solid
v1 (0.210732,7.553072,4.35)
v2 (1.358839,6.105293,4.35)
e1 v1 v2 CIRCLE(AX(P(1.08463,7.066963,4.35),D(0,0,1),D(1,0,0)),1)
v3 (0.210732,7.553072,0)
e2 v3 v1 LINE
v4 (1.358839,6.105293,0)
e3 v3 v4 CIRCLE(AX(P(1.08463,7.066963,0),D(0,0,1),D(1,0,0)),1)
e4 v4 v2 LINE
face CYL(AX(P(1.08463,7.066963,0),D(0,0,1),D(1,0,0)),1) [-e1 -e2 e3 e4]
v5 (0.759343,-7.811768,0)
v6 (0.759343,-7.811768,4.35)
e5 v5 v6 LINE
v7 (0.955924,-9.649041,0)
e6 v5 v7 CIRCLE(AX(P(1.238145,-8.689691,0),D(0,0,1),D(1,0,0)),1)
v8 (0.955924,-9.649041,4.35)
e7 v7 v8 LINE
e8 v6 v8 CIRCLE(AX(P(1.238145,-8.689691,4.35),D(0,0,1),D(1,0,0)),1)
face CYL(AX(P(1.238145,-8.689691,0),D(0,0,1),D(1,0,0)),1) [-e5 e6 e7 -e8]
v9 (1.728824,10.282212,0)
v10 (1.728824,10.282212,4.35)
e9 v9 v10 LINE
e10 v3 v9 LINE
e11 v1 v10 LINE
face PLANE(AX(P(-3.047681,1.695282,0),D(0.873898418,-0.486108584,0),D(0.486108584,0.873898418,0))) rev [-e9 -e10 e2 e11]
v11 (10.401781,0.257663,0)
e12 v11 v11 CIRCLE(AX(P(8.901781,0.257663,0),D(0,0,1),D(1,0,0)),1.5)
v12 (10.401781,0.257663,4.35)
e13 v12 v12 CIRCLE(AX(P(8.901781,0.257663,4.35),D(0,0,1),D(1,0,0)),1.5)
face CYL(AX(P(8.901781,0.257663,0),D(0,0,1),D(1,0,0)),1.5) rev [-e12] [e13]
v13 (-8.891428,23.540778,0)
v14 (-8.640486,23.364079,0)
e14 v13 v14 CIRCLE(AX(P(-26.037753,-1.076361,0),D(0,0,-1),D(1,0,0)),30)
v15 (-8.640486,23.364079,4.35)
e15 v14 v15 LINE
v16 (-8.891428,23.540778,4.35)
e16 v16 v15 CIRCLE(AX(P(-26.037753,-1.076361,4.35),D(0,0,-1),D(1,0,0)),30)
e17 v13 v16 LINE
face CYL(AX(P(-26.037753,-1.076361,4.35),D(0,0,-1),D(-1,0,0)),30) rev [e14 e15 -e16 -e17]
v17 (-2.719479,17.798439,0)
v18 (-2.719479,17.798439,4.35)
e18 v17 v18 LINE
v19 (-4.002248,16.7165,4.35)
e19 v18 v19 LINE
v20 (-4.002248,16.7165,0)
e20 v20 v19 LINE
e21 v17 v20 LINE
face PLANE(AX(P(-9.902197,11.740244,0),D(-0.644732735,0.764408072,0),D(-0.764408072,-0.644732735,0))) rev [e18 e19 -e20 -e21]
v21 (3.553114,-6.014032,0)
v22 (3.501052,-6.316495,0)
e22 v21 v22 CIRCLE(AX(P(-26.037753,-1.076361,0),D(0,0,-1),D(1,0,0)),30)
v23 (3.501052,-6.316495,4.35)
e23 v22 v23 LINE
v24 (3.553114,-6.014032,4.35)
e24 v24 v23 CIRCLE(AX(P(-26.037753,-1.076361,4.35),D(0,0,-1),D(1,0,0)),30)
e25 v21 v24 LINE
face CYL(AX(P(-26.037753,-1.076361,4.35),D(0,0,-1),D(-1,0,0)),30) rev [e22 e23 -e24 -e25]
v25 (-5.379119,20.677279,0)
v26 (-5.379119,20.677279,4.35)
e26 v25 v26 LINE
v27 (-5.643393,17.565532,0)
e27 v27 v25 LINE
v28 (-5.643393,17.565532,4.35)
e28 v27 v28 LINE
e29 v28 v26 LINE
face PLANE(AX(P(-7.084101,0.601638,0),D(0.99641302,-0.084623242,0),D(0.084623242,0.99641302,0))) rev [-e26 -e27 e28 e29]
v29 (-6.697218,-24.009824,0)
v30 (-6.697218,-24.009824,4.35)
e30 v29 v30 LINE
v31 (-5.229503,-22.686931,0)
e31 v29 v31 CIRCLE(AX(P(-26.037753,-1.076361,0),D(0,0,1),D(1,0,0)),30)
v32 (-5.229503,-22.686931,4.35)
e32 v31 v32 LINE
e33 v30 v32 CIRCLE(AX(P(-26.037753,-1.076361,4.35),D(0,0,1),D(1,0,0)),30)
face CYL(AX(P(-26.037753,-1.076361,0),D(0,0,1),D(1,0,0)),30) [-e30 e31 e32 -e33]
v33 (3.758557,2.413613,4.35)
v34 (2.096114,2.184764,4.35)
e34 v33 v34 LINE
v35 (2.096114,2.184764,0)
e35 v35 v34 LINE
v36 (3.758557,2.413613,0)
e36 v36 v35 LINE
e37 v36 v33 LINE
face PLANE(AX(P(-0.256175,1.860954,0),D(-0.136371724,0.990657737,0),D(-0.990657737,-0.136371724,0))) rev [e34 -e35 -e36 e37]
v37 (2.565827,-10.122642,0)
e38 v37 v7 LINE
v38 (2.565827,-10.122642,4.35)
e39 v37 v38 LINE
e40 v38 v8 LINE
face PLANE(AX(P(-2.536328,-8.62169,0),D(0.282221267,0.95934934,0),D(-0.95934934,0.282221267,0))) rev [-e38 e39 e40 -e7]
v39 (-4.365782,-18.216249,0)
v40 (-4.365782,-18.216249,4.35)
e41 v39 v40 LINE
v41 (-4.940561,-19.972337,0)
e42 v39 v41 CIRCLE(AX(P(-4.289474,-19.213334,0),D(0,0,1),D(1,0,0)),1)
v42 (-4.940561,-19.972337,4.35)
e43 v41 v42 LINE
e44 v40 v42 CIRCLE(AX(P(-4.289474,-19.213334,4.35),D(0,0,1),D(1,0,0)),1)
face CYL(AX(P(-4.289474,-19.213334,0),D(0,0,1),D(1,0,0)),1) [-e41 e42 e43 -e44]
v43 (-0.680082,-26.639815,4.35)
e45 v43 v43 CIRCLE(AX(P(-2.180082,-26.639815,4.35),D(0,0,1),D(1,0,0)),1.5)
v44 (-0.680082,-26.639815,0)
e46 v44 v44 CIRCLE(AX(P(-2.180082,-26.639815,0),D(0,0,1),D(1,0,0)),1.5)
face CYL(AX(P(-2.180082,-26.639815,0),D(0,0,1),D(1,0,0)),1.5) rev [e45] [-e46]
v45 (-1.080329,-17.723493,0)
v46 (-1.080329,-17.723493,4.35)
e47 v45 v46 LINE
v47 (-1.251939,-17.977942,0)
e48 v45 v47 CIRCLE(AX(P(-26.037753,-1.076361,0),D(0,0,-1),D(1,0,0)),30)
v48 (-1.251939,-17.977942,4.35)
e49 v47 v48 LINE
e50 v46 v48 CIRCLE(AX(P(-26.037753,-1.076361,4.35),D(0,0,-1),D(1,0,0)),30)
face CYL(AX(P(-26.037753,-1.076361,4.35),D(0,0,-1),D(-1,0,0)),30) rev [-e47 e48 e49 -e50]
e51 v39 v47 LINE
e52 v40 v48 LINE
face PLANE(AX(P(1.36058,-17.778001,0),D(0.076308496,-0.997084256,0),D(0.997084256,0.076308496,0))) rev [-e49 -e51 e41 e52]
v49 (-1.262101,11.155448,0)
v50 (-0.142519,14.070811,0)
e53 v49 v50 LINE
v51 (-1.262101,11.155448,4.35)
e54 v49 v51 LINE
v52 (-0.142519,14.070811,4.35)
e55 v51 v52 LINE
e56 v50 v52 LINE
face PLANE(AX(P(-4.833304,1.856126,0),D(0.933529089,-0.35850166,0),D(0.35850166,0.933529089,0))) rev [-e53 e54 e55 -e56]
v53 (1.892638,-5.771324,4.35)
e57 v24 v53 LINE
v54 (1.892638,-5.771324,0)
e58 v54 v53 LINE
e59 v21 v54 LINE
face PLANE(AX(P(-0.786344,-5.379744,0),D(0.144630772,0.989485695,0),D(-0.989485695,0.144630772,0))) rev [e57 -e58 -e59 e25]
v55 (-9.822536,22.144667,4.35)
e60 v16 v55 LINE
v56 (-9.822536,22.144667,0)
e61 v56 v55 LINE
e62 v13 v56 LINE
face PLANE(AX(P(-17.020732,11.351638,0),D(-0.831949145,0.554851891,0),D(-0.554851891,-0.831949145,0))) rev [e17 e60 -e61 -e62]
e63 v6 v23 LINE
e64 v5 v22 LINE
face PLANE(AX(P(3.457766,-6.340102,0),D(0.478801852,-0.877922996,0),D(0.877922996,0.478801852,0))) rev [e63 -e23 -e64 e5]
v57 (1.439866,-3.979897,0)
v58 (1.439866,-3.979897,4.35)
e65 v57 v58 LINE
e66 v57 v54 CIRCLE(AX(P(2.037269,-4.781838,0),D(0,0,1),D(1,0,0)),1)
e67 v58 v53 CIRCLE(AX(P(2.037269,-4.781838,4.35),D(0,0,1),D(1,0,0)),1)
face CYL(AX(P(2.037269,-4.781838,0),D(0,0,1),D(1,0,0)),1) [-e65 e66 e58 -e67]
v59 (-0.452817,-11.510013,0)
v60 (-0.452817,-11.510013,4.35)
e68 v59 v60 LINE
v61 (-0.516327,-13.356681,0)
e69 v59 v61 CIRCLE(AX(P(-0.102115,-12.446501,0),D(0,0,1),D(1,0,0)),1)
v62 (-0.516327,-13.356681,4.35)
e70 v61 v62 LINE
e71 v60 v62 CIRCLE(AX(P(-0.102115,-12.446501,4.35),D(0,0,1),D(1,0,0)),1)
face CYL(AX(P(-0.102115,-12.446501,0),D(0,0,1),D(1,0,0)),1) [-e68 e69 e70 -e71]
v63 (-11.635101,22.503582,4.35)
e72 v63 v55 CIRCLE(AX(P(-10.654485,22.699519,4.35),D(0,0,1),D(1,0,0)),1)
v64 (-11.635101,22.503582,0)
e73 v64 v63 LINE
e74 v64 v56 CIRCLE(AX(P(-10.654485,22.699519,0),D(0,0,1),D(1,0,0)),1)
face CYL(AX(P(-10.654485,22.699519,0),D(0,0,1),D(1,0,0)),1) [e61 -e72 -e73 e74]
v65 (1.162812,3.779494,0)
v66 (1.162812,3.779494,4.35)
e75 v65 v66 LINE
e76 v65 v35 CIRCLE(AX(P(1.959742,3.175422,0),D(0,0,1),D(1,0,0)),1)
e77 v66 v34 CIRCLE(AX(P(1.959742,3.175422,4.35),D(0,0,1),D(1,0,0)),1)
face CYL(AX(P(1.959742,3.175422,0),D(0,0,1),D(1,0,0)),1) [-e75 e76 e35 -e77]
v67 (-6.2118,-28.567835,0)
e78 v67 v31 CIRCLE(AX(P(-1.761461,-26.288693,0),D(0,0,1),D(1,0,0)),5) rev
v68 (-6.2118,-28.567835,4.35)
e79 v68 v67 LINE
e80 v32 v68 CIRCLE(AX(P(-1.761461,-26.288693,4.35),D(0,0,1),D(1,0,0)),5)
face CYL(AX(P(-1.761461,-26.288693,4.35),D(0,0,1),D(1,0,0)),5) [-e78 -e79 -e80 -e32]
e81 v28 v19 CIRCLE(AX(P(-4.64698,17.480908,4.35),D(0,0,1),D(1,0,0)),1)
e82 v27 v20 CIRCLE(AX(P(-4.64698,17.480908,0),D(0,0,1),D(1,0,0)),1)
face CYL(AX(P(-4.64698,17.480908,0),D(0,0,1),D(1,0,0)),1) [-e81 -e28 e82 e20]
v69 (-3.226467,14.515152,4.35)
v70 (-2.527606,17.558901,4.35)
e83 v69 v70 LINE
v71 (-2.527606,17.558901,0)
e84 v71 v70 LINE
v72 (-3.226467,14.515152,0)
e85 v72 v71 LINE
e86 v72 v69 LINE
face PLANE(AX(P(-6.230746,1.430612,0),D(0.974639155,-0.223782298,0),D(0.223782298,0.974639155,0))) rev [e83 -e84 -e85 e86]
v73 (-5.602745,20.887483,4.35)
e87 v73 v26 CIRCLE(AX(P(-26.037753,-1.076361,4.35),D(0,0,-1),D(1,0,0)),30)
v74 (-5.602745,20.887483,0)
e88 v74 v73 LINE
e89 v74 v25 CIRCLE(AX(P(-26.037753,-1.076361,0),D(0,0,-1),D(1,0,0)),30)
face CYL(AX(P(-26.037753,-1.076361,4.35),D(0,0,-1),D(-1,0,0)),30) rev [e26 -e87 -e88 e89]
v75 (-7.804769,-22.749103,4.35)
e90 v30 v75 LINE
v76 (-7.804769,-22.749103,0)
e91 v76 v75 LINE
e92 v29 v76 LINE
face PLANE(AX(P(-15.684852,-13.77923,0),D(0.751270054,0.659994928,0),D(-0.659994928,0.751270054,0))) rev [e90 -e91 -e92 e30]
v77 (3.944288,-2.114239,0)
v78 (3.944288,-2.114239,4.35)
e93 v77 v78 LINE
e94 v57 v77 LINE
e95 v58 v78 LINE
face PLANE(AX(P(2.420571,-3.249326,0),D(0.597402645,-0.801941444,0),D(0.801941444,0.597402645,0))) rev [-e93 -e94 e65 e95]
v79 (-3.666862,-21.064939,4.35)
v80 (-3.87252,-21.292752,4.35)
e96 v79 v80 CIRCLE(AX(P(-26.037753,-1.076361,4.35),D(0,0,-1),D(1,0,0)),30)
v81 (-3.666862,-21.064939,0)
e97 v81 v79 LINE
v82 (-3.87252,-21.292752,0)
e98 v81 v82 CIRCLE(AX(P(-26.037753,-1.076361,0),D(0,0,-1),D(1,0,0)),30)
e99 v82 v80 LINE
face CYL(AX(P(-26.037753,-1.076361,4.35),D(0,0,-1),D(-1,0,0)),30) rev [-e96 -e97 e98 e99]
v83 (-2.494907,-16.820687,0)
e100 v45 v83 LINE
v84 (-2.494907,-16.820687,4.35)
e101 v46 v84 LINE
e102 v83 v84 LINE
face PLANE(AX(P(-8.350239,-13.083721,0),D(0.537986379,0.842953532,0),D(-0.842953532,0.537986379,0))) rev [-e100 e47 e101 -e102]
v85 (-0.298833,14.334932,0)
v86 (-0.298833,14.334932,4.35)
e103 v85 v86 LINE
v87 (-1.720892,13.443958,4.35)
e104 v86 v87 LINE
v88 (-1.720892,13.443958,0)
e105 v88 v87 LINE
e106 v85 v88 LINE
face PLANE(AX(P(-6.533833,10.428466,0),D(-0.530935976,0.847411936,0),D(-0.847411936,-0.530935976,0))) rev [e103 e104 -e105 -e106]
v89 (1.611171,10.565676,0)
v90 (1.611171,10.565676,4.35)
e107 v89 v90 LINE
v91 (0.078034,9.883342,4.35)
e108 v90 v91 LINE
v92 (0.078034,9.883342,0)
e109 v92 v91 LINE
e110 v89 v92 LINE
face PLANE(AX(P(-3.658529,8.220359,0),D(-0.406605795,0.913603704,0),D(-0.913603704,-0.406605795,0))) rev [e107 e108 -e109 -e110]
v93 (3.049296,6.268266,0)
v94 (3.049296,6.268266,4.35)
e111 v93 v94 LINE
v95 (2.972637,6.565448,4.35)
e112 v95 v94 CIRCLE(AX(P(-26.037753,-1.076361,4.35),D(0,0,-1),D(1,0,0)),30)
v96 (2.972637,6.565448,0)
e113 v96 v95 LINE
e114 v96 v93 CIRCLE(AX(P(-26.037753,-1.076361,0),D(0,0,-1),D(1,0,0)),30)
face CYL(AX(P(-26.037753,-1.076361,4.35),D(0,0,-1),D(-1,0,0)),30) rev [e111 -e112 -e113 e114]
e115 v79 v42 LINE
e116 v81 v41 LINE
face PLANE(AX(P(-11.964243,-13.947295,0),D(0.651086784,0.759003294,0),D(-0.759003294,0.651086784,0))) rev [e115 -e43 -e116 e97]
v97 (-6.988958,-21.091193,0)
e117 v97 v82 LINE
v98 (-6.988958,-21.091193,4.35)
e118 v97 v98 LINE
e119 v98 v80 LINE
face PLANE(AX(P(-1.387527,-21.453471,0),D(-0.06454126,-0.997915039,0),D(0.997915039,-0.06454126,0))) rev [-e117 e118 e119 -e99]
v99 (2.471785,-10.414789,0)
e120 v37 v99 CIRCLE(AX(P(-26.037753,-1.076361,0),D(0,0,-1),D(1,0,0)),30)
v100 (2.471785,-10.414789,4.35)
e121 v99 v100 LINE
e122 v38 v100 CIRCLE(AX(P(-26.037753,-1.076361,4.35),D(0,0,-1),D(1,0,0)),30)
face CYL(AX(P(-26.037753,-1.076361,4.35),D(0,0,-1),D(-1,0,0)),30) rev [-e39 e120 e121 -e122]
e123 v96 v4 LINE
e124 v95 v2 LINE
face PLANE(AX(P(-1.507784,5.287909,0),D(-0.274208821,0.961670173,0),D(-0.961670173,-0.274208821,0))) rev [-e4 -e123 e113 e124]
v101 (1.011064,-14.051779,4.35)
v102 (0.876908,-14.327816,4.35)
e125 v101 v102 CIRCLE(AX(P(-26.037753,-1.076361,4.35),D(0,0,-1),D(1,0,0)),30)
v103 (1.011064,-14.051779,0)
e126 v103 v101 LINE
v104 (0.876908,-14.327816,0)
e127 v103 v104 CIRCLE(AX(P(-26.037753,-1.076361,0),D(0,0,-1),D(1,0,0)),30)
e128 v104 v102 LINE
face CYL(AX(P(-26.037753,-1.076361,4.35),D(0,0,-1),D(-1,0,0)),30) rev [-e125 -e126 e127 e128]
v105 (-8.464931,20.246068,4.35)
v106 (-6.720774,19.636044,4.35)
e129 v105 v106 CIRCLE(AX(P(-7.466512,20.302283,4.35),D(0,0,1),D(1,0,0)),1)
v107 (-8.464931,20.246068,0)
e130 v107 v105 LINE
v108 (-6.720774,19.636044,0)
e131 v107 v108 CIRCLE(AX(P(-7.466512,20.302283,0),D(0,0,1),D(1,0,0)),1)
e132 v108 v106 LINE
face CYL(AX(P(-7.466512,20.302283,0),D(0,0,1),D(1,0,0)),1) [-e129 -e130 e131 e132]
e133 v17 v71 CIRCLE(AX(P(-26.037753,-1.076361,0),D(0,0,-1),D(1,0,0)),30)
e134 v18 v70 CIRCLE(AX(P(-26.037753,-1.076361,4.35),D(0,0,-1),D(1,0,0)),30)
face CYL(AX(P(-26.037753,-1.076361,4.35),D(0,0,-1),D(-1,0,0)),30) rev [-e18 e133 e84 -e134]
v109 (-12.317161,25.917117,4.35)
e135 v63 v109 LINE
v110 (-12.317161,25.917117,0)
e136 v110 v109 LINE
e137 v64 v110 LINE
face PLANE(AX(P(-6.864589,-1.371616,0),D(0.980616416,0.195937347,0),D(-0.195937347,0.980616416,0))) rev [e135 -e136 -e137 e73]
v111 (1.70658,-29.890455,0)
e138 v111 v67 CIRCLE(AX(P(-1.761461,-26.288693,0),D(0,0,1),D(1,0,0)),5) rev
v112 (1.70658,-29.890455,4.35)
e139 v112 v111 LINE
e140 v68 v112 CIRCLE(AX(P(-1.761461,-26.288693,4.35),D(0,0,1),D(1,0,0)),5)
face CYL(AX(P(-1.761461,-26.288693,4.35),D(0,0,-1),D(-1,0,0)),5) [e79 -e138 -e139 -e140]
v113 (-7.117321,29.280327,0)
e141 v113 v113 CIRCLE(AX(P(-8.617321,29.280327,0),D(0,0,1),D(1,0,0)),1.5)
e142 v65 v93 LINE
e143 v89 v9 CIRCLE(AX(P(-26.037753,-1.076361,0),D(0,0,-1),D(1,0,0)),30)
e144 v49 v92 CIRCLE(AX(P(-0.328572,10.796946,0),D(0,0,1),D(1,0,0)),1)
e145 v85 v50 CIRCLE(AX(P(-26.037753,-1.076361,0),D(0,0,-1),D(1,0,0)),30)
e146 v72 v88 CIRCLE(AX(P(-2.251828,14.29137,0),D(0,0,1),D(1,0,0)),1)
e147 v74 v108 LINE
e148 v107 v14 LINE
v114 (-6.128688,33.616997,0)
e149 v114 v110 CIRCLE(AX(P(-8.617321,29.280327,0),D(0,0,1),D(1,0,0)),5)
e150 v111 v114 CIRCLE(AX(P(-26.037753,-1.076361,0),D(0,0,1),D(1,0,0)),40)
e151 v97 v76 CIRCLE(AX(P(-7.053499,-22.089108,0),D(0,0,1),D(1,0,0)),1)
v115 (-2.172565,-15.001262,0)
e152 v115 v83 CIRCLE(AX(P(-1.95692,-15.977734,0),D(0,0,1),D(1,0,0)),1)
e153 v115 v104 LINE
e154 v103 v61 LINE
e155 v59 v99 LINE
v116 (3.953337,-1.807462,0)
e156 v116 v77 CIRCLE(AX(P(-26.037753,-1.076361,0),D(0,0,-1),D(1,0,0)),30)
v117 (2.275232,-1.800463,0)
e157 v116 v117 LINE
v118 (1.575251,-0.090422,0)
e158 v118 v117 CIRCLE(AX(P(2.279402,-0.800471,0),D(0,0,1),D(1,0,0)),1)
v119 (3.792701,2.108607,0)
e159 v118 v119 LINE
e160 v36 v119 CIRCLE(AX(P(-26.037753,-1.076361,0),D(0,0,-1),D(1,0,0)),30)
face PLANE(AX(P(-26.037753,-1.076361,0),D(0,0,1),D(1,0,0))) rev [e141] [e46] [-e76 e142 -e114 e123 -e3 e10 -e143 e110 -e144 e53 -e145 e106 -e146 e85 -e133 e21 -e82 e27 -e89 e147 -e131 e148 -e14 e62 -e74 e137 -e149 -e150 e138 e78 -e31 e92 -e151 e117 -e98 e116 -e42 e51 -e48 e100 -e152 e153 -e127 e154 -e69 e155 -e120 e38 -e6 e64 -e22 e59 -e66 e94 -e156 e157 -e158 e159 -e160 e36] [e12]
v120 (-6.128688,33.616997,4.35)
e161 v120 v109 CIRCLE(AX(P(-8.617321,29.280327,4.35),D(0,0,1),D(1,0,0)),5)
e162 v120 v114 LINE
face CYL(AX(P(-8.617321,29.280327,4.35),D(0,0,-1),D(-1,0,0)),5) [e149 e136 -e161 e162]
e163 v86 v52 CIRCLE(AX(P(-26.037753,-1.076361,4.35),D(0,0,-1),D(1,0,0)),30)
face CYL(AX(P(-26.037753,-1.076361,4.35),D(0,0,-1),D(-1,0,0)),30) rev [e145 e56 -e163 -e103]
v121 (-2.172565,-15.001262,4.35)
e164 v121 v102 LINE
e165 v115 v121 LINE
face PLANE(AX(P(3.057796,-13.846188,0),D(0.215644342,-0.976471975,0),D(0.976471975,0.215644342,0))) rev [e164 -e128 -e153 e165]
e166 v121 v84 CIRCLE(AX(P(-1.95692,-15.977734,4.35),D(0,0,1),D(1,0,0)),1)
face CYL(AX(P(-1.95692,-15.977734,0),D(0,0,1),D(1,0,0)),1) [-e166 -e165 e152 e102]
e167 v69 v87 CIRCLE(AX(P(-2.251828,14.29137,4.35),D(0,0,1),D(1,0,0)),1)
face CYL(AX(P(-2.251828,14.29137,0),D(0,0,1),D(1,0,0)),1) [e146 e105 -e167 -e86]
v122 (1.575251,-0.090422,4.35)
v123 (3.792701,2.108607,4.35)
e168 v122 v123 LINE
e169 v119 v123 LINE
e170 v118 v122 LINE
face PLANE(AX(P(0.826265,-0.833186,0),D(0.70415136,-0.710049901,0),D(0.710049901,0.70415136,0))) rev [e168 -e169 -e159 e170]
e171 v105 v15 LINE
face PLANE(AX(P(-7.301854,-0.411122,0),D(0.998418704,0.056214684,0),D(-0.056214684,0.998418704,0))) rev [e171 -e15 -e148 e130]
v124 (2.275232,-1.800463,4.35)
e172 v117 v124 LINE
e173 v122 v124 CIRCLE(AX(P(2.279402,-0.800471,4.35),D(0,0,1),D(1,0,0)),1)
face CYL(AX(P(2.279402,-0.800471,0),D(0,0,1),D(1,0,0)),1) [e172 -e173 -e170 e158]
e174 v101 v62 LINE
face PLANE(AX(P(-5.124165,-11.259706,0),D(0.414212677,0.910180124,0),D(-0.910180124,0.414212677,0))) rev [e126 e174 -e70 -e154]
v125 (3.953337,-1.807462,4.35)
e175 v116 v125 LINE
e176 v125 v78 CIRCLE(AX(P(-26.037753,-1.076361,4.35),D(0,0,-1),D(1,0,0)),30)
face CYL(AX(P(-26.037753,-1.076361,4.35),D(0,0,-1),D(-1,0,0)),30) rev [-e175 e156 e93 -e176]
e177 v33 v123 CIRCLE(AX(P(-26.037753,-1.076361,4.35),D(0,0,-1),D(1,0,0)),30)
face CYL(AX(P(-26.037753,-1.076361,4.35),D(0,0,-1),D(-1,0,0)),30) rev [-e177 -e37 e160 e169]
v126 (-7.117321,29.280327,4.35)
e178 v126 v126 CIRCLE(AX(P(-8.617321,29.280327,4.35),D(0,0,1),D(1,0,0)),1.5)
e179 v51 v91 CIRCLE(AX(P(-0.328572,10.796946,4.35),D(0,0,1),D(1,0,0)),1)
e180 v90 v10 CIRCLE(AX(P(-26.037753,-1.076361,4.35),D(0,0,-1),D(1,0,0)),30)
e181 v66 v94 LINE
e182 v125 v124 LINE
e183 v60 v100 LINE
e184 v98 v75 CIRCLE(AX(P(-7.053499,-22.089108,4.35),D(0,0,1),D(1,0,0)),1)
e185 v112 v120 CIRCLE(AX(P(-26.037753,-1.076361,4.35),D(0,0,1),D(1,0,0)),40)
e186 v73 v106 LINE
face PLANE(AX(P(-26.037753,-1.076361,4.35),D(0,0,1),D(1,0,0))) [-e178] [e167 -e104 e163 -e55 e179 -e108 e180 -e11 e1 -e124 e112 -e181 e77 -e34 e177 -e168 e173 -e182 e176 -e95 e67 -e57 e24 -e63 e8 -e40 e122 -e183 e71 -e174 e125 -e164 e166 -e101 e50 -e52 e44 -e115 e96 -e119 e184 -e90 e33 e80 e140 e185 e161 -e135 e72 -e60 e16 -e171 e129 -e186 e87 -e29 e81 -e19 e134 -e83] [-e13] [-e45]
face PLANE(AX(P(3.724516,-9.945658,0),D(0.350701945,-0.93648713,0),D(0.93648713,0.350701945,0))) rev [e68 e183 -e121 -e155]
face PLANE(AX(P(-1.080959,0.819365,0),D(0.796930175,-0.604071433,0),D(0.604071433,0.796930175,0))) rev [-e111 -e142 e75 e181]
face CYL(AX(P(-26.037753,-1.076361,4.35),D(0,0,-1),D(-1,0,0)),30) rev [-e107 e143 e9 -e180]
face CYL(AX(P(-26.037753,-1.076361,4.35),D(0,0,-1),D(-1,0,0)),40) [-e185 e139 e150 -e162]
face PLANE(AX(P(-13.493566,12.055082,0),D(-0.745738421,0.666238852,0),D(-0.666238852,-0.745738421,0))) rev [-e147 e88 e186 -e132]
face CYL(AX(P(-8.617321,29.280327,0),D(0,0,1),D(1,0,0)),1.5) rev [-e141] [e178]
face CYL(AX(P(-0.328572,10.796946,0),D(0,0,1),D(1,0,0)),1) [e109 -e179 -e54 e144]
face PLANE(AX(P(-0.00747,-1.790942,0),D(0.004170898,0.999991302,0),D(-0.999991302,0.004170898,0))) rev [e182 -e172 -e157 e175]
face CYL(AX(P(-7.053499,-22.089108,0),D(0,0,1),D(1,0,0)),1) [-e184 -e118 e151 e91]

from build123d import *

# Parameters (mm, degrees)
BOSS_EXTRU_1_DEPTH      = 4.35
ENL_V_MAT_EXTRU_1_DEPTH = 38.269393438
CONG_3_R                = 5
ESQUISSE3_R             = 1.5
ENL_V_MAT_EXTRU_2_DEPTH = 38.269393579
BOSS_EXTRU_2_DEPTH      = 4.35


with BuildPart() as part:
    # Esquisse1 → Boss.-Extru.1 (new body)
    with BuildSketch(Plane.XY):
        with BuildLine():
            Line((-13.183298291, -31.679408844), (-0.713739606, -32.039150948))
            ThreePointArc((-0.713739606, -32.039150948), (13.826896651, 2.211449904), (-6.128687986, 33.616997237))
            ThreePointArc((-6.128687986, 33.616997237), (-12.95399094, 31.768960554), (-11.105954257, 24.9436576))
            ThreePointArc((-11.105954257, 24.9436576), (3.84132079, 1.61453914), (-6.69721834, -24.00982412))
            ThreePointArc((-6.69721834, -24.00982412), (-10.263527106, -27.571231769), (-13.183298291, -31.679408844))
        make_face()
    extrude(amount=BOSS_EXTRU_1_DEPTH)

    # Esquisse2 → Enlèv. mat.-Extru.1 (cut, through all)
    with BuildSketch(Plane(origin=(0, 0, 0), x_dir=(-1, 0, 0), z_dir=(0, 0, -1))):
        with BuildLine():
            Line((13.183298291, -31.679408844), (0.713739606, -32.039150948))
            ThreePointArc((0.713739606, -32.039150948), (5.648573529, -29.472487497), (6.69721834, -24.00982412))
            ThreePointArc((6.69721834, -24.00982412), (10.263527106, -27.571231769), (13.183298291, -31.679408844))
        make_face()
    extrude(amount=-ENL_V_MAT_EXTRU_1_DEPTH, mode=Mode.SUBTRACT)

    # Congé3
    cong_3_edges = [part.edges().sort_by_distance(p)[0] for p in [
        (-0.713739606, -32.039150948, 2.175),
        (-6.69721834, -24.00982412, 2.175),
    ]]
    fillet(cong_3_edges, radius=CONG_3_R - 0.0001)  # a hair under: the kernel refuses the full size

    # Esquisse3 → Enlèv. mat.-Extru.2 (cut, through all)
    with BuildSketch(Plane.XY.offset(4.35)):
        with Locations((-8.617321121, 29.280327419)):
            Circle(ESQUISSE3_R)
        with Locations((8.901780596, 0.257662949)):
            Circle(ESQUISSE3_R)
        with Locations((-2.180082362, -26.639815256)):
            Circle(ESQUISSE3_R)
    extrude(amount=-ENL_V_MAT_EXTRU_2_DEPTH, mode=Mode.SUBTRACT)

    # Esquisse4 → Boss.-Extru.2 (add, through all)
    with BuildSketch(Plane.XY.offset(4.35)):
        with BuildLine():
            Line((-9.822535933, 22.144666991), (-8.891427789, 23.540777623))
            ThreePointArc((-8.891427789, 23.540777623), (-9.983360232, 24.266418144), (-11.105954257, 24.9436576))
            ThreePointArc((-11.105954257, 24.9436576), (-11.749605725, 25.383047193), (-12.317161418, 25.917117378))
            Line((-12.317161418, 25.917117378), (-12.247003841, 25.565996611))
            Line((-12.247003841, 25.565996611), (-11.635101494, 22.503581534))
            ThreePointArc((-11.635101494, 22.503581534), (-10.848728229, 21.718565469), (-9.822535933, 22.144666991))
        make_face()
        with BuildLine():
            Line((-6.720773728, 19.63604394), (-5.602744878, 20.887482618))
            ThreePointArc((-5.602744878, 20.887482618), (-7.081127932, 22.175442131), (-8.640486445, 23.364078822))
            Line((-8.640486445, 23.364078822), (-8.464930853, 20.246068108))
            ThreePointArc((-8.464930853, 20.246068108), (-7.796654849, 19.358351758), (-6.720773728, 19.63604394))
        make_face()
        with BuildLine():
            Line((-4.002247722, 16.716500355), (-2.719479126, 17.798439356))
            ThreePointArc((-2.719479126, 17.798439356), (-4.002235611, 19.281339204), (-5.379119408, 20.677278733))
            Line((-5.379119408, 20.677278733), (-5.643393478, 17.565531668))
            ThreePointArc((-5.643393478, 17.565531668), (-5.106472893, 16.592726743), (-4.002247722, 16.716500355))
        make_face()
        with BuildLine():
            Line((-1.720891689, 13.443958065), (-0.298832635, 14.33493243))
            ThreePointArc((-0.298832635, 14.33493243), (-1.360513504, 15.983352852), (-2.527606113, 17.558900694))
            Line((-2.527606113, 17.558900694), (-3.22646682, 14.515152299))
            ThreePointArc((-3.22646682, 14.515152299), (-2.831553807, 13.476558611), (-1.720891689, 13.443958065))
        make_face()
        with BuildLine():
            Line((0.078033764, 9.883342162), (1.611170559, 10.565675544))
            ThreePointArc((1.611170559, 10.565675544), (0.791628357, 12.346912961), (-0.142518712, 14.07081128))
            Line((-0.142518712, 14.07081128), (-1.262101119, 11.155447526))
            ThreePointArc((-1.262101119, 11.155447526), (-1.017030492, 10.071670094), (0.078033764, 9.883342162))
        make_face()
        with BuildLine():
            Line((1.358839136, 6.105292932), (2.972637242, 6.565448283))
            ThreePointArc((2.972637242, 6.565448283), (2.411492888, 8.444164113), (1.728824224, 10.282211897))
            Line((1.728824224, 10.282211897), (0.210731898, 7.553071689))
            ThreePointArc((0.210731898, 7.553071689), (0.301098098, 6.445611945), (1.358839136, 6.105292932))
        make_face()
        with BuildLine():
            Line((2.096114089, 2.184764392), (3.758556811, 2.413612532))
            ThreePointArc((3.758556811, 2.413612532), (3.46694304, 4.352534286), (3.04929648, 6.268265872))
            Line((3.04929648, 6.268265872), (1.16281219, 3.779493562))
            ThreePointArc((1.16281219, 3.779493562), (1.096681157, 2.670322781), (2.096114089, 2.184764392))
        make_face()
        with BuildLine():
            Line((2.275231572, -1.800462743), (3.953337136, -1.807462011))
            ThreePointArc((3.953337136, -1.807462011), (3.937039374, 0.15319873), (3.792700751, 2.108607261))
            Line((3.792700751, 2.108607261), (1.575251109, -0.090421541))
            ThreePointArc((1.575251109, -0.090421541), (1.35393484, -1.179298138), (2.275231572, -1.800462743))
        make_face()
        with BuildLine():
            Line((0.955923809, -9.649040634), (2.565827278, -10.122641832))
            ThreePointArc((2.565827278, -10.122641832), (3.095663042, -8.234857357), (3.501051982, -6.316494523))
            Line((3.501051982, -6.316494523), (0.759343223, -7.811768298))
            ThreePointArc((0.759343223, -7.811768298), (0.243820453, -8.79607994), (0.955923809, -9.649040634))
        make_face()
        with BuildLine():
            Line((1.89263801, -5.771324181), (3.553113903, -6.014031995))
            ThreePointArc((3.553113903, -6.014031995), (3.812455487, -4.07053049), (3.944288385, -2.114239038))
            Line((3.944288385, -2.114239038), (1.439866137, -3.979897042))
            ThreePointArc((1.439866137, -3.979897042), (1.067755401, -5.026876858), (1.89263801, -5.771324181))
        make_face()
        with BuildLine():
            Line((-0.516327235, -13.356680753), (1.011064381, -14.051779397))
            ThreePointArc((1.011064381, -14.051779397), (1.80088273, -12.257164359), (2.471785062, -10.414789202))
            Line((2.471785062, -10.414789202), (-0.452816504, -11.510013499))
            ThreePointArc((-0.452816504, -11.510013499), (-1.101523675, -12.412128869), (-0.516327235, -13.356680753))
        make_face()
        with BuildLine():
            Line((-2.494906628, -16.820687389), (-1.080329313, -17.723493178))
            ThreePointArc((-1.080329313, -17.723493178), (-0.046197856, -16.057651562), (0.876907606, -14.327815597))
            Line((0.876907606, -14.327815597), (-2.172564591, -15.001261883))
            ThreePointArc((-2.172564591, -15.001261883), (-2.941586238, -15.803283605), (-2.494906628, -16.820687389))
        make_face()
        with BuildLine():
            Line((-4.940560652, -19.972336923), (-3.666861923, -21.064938782))
            ThreePointArc((-3.666861923, -21.064938782), (-2.40893385, -19.560919792), (-1.251939064, -17.977941831))
            Line((-1.251939064, -17.977941831), (-4.365782364, -18.216249374))
            ThreePointArc((-4.365782364, -18.216249374), (-5.239861602, -18.902265862), (-4.940560652, -19.972336923))
        make_face()
        with BuildLine():
            ThreePointArc((-5.229503112, -22.686931264), (-4.539706777, -22.000844712), (-3.872520027, -21.292751794))
            Line((-3.872520027, -21.292751794), (-6.988957821, -21.091192728))
            ThreePointArc((-6.988957821, -21.091192728), (-7.95075349, -21.647593865), (-7.804769136, -22.749102695))
            Line((-7.804769136, -22.749102695), (-6.69721834, -24.00982412))
            ThreePointArc((-6.69721834, -24.00982412), (-5.952466431, -23.360464628), (-5.229503112, -22.686931264))
        make_face()
    extrude(amount=-BOSS_EXTRU_2_DEPTH)


solid = part.part
